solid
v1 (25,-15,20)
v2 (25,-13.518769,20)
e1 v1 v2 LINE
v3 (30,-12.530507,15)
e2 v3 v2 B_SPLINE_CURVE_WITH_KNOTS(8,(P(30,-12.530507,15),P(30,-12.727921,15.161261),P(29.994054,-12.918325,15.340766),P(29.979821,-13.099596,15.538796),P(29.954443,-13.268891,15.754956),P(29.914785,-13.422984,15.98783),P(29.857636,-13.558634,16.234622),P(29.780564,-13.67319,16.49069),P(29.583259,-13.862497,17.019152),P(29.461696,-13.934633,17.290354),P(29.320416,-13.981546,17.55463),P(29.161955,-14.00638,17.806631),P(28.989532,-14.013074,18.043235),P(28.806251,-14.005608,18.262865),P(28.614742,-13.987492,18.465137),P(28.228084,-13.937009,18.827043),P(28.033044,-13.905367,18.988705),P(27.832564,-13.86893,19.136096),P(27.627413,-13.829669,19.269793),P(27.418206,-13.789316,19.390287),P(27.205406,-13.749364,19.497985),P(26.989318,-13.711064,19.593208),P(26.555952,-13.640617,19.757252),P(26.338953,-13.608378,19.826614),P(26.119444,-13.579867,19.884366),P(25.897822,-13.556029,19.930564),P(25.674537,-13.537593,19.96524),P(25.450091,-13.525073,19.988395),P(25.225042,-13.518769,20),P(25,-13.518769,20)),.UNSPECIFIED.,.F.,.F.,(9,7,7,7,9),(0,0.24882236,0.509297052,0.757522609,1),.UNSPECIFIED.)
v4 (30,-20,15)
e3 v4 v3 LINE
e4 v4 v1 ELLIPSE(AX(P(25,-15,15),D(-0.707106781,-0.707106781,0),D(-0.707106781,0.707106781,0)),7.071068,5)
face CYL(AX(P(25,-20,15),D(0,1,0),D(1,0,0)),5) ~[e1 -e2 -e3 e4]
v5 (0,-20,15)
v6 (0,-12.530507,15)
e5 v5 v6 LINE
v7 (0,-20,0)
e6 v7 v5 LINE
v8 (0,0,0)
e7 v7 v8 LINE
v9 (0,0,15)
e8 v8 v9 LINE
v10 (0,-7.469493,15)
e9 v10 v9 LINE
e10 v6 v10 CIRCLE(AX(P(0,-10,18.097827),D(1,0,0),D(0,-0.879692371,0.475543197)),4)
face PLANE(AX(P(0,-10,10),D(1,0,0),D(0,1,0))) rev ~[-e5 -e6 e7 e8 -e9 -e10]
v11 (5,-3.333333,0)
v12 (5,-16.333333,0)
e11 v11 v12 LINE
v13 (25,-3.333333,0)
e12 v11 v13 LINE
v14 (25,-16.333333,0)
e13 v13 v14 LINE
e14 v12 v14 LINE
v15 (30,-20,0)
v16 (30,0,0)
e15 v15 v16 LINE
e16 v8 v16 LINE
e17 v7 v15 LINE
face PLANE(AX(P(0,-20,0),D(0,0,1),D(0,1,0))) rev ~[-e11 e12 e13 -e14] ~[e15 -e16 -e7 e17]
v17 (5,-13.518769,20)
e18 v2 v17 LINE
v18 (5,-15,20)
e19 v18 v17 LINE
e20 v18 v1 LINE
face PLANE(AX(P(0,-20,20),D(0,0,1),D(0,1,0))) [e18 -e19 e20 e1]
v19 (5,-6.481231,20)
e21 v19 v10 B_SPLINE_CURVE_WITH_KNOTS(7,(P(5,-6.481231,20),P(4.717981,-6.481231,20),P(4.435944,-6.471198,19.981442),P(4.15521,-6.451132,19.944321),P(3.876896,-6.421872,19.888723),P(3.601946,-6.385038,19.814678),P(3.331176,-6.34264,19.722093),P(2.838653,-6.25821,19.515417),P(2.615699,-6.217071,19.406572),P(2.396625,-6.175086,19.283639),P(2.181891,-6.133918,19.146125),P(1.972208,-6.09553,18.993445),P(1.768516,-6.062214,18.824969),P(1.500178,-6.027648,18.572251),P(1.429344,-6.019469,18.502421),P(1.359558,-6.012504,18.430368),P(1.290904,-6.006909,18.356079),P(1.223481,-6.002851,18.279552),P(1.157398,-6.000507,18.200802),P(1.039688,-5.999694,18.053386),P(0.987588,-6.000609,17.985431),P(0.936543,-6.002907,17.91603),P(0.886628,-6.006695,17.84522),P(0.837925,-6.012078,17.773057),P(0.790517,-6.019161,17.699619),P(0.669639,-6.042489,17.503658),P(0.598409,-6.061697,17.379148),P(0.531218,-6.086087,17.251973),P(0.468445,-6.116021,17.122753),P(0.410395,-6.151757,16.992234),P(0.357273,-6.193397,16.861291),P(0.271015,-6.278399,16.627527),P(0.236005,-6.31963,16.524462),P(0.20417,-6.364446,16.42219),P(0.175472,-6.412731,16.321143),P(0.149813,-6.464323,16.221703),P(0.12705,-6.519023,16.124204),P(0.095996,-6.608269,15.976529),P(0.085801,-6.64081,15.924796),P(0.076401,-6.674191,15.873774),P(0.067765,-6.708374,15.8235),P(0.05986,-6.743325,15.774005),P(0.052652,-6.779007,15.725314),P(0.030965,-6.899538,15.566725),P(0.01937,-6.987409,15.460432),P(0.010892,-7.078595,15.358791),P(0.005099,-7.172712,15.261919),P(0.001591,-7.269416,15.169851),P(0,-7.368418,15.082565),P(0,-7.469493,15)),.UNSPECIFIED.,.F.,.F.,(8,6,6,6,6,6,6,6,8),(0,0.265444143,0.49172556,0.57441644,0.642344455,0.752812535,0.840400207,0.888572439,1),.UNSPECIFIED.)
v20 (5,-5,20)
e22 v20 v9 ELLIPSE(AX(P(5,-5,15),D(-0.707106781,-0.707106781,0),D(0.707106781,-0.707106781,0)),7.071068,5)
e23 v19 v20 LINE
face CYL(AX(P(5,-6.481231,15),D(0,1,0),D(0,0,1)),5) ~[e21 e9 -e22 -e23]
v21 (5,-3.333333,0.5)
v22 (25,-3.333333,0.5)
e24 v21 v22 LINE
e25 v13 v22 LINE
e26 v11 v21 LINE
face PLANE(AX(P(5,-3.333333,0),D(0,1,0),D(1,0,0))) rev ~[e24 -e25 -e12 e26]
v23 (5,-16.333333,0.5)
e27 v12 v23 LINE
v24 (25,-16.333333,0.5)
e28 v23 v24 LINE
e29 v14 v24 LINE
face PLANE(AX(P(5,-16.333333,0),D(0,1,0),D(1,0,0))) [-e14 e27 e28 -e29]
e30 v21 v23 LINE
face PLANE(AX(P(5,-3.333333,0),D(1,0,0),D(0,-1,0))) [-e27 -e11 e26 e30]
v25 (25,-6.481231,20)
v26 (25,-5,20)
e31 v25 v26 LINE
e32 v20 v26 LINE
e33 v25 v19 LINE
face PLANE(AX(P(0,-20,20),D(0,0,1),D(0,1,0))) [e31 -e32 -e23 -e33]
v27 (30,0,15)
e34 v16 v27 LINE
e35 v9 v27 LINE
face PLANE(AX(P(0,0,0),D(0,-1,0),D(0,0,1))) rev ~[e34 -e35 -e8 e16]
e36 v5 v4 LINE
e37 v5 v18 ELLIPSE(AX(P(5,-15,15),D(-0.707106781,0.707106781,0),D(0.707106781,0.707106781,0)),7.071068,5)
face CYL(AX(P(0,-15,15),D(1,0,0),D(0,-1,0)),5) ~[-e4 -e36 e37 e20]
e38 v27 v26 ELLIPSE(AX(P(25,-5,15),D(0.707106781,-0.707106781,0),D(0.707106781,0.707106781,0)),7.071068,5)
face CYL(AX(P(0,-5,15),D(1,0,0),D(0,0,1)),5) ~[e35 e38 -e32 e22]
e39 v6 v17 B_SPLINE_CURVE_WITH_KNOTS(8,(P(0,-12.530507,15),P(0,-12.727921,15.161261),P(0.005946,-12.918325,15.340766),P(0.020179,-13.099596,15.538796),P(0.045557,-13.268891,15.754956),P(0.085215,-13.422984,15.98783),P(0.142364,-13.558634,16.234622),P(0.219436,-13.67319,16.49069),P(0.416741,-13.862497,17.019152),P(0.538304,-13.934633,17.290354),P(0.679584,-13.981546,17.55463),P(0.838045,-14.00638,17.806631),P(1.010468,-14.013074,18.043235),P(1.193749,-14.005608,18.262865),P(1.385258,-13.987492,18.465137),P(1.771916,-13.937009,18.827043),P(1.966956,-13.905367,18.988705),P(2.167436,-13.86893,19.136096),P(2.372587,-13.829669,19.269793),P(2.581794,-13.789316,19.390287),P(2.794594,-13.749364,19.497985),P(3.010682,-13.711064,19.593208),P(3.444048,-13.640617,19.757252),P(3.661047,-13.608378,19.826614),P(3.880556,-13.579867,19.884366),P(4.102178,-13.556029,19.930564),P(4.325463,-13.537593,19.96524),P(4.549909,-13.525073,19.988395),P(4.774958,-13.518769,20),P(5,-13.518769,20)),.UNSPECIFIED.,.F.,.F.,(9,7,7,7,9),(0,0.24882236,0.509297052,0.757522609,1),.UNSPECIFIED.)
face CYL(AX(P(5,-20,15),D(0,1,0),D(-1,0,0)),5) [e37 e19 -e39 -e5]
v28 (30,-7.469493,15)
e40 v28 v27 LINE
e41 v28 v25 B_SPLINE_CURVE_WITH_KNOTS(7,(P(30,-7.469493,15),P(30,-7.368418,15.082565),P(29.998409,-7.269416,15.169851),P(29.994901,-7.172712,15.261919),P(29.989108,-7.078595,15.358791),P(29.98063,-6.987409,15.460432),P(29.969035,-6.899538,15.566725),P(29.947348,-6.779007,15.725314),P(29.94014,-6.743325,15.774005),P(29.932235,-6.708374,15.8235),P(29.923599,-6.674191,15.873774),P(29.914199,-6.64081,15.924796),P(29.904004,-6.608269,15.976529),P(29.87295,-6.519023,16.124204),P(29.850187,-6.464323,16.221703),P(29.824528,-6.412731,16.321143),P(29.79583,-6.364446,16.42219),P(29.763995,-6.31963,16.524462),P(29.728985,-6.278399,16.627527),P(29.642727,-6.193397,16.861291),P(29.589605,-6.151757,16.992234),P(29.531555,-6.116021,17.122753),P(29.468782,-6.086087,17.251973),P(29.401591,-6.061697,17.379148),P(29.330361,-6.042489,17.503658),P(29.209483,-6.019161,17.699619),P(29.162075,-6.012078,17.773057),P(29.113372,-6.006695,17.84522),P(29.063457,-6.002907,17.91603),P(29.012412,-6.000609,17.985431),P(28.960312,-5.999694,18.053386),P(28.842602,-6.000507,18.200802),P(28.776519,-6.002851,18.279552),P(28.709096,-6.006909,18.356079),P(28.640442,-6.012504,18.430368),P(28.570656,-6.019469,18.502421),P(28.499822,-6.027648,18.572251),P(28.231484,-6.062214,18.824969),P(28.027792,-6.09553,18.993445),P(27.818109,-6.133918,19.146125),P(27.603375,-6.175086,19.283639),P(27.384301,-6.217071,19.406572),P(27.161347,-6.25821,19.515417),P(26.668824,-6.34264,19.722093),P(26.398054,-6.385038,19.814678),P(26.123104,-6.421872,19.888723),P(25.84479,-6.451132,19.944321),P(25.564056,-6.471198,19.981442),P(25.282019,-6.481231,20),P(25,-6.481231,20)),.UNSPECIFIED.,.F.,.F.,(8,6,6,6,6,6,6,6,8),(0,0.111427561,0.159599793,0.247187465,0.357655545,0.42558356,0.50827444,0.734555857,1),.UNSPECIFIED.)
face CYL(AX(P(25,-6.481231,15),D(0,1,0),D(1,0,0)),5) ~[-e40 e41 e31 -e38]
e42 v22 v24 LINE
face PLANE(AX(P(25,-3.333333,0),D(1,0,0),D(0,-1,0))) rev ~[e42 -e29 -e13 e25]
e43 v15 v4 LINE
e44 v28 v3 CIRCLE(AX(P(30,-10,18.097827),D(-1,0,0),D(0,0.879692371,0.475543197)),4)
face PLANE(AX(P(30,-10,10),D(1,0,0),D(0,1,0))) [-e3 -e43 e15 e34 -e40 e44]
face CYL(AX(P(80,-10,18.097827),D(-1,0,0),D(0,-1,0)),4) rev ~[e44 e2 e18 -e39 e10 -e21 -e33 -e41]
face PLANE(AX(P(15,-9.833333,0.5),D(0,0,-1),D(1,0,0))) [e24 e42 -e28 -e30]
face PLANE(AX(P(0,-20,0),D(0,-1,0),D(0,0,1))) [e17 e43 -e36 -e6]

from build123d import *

# Parameters (mm, degrees)
F0_W     = 20
F0_H     = 20
F1_DEPTH = 30
F3_D     = 8
F3_DEPTH = 50
F3_TIP   = 2.4034424761
F4_R     = 5
F5_W     = 20
F5_H     = 13
F6_DEPTH = 0.5


# Not quite as in the source:
# - a feature names something its author has since deleted; it is built from what else it names


with BuildPart() as f1:
    # F0 (on Right) → F1 (new body)
    with BuildSketch(Plane.YZ):
        with Locations((-10, 10)):
            Rectangle(F0_W, F0_H)
    extrude(amount=F1_DEPTH)

    # F3
    with Locations(Plane.YZ.offset(30)):
        with Locations((-10, 18.097827211)):
            Hole(F3_D / 2, depth=F3_DEPTH)
            with Locations((0, 0, -(F3_DEPTH + F3_TIP / 2))):  # 118° drill point
                Cone(0, F3_D / 2, F3_TIP, mode=Mode.SUBTRACT)

    # F4
    f4_edges = [f1.edges().sort_by_distance(p)[0] for p in [
        (30, -3.240615, 20),
        (30, -16.759385, 20),
        (15, -20, 20),
        (15, 0, 20),
        (0, -16.759385, 20),
        (0, -3.240615, 20),
    ]]
    fillet(f4_edges, radius=F4_R)

    # F5 (on face) → F6 (cut)
    with BuildSketch(Plane(origin=(0, 0, 0), x_dir=(1, 0, 0), z_dir=(0, 0, -1))):
        with Locations((15, 9.8333333333)):
            Rectangle(F5_W, F5_H)
    extrude(amount=-F6_DEPTH, mode=Mode.SUBTRACT)


solid = f1.part
